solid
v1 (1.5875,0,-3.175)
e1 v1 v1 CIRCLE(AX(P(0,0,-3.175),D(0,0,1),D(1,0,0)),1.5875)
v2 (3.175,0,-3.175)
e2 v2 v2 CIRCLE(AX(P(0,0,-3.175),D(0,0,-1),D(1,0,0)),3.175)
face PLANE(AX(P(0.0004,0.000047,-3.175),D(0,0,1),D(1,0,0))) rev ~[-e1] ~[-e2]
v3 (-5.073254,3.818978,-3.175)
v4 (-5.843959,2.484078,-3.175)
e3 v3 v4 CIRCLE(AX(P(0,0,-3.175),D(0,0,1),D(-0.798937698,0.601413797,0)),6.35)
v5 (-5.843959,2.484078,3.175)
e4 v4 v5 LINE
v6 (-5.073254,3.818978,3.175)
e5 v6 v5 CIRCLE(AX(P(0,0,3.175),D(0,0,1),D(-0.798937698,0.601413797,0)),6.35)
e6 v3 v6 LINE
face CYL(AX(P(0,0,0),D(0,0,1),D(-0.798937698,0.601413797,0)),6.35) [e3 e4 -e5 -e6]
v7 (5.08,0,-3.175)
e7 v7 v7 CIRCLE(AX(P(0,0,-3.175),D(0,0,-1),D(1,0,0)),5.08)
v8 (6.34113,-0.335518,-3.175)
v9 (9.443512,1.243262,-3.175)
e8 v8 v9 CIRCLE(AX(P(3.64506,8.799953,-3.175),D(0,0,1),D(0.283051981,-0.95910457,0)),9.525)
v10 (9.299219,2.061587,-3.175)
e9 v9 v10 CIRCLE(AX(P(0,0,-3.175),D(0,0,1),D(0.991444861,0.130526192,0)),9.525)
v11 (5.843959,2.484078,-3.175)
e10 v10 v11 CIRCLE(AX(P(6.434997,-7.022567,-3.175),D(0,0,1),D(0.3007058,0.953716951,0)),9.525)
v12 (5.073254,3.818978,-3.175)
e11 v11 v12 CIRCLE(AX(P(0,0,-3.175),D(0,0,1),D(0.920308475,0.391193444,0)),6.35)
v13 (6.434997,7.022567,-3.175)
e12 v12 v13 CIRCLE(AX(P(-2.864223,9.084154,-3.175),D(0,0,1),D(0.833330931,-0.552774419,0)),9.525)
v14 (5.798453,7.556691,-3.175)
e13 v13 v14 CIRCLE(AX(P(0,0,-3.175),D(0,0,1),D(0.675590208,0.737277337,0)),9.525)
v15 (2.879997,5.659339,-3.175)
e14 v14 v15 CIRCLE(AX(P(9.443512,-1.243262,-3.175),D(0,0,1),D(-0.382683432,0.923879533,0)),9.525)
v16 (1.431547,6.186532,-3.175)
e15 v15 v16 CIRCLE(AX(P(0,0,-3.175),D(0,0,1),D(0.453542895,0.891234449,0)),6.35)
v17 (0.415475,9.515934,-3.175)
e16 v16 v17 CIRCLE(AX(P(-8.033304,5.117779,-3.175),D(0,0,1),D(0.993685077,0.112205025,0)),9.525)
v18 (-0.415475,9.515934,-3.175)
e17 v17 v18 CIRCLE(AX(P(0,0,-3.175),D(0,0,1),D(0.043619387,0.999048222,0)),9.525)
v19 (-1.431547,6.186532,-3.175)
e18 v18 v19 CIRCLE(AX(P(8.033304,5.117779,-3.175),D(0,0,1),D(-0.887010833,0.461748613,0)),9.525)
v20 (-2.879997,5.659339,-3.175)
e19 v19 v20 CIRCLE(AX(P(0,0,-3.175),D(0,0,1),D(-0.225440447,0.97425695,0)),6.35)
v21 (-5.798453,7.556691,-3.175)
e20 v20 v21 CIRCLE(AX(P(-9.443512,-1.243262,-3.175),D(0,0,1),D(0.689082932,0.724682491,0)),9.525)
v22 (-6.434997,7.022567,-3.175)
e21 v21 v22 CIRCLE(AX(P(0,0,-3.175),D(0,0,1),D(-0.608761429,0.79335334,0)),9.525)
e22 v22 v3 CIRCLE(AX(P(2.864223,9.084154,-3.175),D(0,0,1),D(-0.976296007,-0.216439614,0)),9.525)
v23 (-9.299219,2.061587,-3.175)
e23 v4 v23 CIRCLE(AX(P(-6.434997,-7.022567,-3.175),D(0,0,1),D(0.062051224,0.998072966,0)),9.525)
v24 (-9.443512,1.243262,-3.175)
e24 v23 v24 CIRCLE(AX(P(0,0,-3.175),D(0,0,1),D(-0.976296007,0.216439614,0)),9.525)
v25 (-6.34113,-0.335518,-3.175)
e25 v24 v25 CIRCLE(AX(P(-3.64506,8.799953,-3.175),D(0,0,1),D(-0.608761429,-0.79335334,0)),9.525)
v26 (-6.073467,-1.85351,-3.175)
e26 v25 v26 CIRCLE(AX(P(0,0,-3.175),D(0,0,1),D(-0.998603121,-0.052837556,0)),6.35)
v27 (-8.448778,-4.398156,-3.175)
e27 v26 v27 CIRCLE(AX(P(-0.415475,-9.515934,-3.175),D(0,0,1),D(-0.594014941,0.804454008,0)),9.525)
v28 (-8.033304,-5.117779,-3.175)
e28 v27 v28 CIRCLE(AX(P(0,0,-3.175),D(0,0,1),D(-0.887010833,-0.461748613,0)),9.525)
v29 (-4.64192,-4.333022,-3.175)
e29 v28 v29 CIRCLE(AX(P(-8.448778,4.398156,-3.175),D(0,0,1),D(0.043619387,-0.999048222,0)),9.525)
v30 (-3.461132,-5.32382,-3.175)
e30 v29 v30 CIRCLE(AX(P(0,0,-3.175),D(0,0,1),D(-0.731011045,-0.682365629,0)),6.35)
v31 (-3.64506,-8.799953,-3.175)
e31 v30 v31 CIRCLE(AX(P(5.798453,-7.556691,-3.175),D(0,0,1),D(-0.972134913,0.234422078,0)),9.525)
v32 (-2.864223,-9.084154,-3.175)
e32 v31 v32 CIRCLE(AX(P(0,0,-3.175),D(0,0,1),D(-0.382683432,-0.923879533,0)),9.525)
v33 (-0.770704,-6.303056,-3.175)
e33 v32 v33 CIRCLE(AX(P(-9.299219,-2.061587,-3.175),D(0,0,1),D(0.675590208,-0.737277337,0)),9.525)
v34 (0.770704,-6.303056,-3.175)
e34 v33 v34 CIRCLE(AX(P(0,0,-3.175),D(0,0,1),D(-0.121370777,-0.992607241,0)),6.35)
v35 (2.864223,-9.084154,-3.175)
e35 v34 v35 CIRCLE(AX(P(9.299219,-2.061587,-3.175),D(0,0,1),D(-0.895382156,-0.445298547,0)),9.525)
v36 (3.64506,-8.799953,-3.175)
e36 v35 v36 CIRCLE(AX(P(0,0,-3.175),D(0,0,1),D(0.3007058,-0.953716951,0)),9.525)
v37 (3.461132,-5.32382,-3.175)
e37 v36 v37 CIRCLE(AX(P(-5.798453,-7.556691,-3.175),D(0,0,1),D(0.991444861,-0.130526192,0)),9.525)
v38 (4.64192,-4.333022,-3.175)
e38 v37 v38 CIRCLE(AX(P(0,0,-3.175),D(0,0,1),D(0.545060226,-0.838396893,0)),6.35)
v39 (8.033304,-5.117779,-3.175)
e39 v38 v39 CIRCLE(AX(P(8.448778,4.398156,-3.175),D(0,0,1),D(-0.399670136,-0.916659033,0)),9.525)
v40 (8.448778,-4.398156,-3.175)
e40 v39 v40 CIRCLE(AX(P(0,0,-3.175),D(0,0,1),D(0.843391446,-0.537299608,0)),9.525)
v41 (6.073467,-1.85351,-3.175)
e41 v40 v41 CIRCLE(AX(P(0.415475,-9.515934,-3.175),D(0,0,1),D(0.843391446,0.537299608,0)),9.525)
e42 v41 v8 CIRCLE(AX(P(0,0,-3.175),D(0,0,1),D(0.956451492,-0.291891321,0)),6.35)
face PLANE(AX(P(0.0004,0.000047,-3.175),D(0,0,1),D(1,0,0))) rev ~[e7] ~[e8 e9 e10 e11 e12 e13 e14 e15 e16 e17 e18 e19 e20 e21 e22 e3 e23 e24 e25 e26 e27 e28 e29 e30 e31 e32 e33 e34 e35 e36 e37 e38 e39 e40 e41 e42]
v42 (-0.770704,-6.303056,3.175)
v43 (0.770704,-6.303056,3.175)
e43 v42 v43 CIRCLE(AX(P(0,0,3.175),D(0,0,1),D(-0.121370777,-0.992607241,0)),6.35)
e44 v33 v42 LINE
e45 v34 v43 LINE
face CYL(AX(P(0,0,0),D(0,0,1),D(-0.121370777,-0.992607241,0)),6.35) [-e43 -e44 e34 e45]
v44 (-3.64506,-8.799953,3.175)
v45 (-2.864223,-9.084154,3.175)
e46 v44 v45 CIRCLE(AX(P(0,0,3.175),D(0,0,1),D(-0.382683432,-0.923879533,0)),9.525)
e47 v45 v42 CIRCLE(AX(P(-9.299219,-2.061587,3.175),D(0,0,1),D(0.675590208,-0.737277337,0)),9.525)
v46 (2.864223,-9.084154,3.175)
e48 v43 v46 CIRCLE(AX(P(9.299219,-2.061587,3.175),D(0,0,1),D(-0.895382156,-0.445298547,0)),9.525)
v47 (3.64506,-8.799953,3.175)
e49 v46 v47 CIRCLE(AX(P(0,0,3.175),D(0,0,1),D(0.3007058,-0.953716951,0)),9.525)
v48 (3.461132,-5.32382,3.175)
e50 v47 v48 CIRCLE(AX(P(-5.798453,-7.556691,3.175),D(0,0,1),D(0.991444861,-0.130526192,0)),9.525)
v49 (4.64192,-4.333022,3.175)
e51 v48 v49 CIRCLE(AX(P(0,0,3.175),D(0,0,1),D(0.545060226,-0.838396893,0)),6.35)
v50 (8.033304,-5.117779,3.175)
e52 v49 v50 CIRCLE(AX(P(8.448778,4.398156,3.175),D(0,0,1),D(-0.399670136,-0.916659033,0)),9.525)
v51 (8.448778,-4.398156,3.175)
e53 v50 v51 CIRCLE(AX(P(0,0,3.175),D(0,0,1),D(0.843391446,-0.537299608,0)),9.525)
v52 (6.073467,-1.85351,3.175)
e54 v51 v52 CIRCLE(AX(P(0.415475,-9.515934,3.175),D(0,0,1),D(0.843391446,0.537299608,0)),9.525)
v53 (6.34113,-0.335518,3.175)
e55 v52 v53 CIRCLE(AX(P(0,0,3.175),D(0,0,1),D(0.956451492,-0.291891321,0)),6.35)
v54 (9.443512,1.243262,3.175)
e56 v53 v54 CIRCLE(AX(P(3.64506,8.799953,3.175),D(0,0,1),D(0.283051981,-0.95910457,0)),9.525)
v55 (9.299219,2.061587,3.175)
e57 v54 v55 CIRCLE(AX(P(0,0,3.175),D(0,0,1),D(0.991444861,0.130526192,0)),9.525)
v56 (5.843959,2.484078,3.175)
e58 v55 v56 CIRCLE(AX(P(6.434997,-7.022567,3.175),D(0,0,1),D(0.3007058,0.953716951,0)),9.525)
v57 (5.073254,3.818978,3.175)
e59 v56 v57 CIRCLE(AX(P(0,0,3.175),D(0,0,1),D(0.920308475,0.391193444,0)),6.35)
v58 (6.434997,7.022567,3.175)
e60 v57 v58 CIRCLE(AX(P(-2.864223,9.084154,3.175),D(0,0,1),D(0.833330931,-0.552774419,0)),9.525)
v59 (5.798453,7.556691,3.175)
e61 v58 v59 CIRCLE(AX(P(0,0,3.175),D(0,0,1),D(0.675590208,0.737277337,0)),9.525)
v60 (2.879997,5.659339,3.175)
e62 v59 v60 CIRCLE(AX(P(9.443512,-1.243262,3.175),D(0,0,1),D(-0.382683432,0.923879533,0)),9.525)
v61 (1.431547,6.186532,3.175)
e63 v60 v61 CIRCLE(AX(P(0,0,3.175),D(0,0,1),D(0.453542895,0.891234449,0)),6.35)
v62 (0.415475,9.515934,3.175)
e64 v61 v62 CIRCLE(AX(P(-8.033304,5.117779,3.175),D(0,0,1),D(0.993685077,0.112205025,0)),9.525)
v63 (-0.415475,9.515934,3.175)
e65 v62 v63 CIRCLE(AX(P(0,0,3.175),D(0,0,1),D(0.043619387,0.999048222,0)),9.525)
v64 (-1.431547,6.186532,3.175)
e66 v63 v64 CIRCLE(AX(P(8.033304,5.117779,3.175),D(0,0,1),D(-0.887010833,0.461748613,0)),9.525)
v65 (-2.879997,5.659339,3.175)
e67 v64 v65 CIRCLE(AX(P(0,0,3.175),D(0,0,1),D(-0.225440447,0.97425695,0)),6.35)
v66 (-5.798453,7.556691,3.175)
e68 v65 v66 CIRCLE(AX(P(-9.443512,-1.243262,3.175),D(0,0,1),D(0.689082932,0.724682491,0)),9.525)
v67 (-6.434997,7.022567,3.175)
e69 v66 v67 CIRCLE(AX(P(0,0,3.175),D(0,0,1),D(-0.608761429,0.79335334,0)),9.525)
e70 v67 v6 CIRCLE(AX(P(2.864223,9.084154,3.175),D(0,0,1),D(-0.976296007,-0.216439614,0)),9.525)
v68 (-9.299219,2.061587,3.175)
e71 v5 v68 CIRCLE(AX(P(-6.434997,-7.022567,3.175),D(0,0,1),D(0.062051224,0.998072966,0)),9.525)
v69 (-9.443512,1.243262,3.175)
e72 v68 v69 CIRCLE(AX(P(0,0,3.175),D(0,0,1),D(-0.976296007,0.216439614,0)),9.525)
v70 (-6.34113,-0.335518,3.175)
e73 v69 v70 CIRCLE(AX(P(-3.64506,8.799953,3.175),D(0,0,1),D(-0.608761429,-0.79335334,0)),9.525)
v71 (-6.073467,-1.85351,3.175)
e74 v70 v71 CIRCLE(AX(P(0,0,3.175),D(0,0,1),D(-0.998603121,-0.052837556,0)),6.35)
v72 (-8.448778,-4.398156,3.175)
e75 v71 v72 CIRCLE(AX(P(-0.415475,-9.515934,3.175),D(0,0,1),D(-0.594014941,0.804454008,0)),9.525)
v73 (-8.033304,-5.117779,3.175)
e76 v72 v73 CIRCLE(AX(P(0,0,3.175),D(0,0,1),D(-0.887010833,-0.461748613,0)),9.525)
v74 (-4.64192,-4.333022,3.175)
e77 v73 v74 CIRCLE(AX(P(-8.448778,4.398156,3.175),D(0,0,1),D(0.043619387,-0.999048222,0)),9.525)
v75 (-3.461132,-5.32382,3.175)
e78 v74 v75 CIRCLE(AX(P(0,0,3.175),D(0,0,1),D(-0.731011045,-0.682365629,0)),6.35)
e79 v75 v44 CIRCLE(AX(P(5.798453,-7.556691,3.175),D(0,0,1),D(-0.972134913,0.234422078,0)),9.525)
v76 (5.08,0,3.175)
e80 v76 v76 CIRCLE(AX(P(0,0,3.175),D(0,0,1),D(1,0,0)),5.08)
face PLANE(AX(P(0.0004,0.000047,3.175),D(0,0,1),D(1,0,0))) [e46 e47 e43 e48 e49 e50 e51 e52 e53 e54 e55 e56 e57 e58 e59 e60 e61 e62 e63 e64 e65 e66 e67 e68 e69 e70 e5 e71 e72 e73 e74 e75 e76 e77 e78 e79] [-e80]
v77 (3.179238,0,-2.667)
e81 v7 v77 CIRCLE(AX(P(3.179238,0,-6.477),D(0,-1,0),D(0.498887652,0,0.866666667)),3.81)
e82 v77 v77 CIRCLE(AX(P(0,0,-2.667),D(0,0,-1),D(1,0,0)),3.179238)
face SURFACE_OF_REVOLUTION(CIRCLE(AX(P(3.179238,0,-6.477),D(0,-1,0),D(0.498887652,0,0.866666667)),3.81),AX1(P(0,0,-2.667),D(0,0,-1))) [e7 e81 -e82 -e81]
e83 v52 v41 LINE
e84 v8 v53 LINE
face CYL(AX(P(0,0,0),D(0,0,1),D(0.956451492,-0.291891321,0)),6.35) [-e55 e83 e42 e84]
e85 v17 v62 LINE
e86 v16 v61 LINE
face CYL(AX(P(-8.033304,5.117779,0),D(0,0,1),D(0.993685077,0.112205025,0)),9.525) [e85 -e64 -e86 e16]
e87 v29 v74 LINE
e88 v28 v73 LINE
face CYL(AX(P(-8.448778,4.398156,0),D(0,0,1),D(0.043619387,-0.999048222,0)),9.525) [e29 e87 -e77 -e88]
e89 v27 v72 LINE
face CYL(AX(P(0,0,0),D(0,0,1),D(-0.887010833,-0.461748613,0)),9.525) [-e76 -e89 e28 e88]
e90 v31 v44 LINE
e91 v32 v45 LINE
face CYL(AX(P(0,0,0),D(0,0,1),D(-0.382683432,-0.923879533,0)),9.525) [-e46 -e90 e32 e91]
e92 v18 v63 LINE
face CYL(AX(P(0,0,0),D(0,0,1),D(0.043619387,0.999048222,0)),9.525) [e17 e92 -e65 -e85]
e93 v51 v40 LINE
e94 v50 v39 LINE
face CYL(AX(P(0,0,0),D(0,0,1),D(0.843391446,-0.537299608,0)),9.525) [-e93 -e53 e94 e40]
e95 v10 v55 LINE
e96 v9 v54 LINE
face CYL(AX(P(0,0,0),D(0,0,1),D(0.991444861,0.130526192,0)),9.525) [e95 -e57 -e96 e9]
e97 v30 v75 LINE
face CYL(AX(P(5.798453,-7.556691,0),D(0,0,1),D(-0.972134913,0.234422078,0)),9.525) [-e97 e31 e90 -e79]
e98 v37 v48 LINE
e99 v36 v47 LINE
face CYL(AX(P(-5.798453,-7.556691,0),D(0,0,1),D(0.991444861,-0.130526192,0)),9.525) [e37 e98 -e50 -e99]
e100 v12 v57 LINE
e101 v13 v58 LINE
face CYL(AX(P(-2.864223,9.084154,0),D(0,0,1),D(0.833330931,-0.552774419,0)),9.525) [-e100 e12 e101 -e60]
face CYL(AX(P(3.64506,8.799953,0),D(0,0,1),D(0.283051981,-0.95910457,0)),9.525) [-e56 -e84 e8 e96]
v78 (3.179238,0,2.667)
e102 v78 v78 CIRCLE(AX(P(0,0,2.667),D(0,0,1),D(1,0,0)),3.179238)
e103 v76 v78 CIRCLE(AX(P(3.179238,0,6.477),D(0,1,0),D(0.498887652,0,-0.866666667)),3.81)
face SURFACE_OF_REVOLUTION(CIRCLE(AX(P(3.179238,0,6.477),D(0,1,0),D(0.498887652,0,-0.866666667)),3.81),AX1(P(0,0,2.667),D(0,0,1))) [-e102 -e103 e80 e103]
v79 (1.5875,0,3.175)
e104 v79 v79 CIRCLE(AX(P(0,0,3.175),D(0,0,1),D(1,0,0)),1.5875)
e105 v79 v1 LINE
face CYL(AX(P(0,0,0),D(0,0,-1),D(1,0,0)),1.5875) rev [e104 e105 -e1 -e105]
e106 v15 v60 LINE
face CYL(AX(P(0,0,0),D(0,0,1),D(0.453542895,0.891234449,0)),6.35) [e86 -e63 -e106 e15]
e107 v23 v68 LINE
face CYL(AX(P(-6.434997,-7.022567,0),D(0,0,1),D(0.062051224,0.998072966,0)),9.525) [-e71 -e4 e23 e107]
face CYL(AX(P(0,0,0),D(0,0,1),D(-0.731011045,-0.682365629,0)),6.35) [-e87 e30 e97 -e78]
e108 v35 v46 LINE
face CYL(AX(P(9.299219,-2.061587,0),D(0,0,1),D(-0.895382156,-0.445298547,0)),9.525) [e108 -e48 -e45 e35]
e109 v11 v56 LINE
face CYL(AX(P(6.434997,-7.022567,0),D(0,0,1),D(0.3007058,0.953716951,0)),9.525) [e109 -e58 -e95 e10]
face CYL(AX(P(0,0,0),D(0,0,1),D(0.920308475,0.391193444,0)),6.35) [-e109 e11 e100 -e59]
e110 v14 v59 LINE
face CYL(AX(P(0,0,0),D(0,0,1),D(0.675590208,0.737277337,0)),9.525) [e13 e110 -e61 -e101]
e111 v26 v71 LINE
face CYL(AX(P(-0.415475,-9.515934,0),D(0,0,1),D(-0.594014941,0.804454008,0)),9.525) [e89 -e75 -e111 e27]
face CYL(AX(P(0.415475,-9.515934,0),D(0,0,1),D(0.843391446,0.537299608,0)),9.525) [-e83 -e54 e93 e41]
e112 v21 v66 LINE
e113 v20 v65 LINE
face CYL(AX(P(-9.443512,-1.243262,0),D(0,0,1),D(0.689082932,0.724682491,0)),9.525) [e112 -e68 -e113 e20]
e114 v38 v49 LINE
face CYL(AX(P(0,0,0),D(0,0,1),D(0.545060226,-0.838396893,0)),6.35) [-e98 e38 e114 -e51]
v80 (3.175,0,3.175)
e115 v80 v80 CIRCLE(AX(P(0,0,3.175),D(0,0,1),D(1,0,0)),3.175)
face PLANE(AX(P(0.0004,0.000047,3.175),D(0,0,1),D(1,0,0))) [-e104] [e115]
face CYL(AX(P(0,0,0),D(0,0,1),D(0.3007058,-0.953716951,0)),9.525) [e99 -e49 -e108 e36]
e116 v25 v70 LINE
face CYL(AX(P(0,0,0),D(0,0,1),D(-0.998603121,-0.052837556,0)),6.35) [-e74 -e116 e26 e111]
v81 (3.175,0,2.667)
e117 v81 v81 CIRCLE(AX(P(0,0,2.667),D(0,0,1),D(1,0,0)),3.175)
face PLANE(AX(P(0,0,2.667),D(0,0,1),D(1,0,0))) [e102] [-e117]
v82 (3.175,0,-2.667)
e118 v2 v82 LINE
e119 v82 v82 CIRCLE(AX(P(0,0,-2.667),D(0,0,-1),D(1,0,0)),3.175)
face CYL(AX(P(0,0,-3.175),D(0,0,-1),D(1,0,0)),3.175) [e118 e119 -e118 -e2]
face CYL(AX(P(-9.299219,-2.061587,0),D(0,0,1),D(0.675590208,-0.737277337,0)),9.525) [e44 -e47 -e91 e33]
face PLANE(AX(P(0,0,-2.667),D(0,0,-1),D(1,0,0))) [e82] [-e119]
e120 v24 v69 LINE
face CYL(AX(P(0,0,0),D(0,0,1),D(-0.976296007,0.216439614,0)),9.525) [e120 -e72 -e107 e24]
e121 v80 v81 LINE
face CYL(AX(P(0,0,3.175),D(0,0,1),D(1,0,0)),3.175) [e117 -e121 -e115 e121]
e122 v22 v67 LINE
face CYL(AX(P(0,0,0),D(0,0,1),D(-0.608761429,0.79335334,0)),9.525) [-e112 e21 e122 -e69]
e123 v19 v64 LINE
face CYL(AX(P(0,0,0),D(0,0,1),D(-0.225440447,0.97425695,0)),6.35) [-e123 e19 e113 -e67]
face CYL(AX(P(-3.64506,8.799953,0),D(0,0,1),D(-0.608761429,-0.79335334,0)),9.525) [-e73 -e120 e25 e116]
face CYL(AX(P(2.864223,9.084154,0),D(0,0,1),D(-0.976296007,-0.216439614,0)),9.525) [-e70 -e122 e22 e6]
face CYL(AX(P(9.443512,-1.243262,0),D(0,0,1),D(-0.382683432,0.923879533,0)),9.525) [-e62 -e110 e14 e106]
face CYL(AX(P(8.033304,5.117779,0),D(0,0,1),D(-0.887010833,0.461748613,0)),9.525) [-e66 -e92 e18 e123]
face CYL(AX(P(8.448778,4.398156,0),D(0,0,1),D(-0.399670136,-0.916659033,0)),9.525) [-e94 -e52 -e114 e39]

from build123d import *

# Parameters (mm, degrees)
F0_R     = 4.7625
F0_R_2   = 3.175
F0_R_3   = 1.5875
F1_DEPTH = 3.175
F2_R     = 5.08
F2_R_2   = 3.175
F3_DEPTH = 0.508
F4_R     = 5.08
F4_R_2   = 3.175
F5_DEPTH = 0.508


# Not quite as in the source:
# - a fillet or chamfer that OpenCascade refuses, or shapes differently, is made with other operations: its cross-section is extruded or revolved along the edge and cut away or added


with BuildPart() as f1:
    # F0 (on Top) → F1 (new body, symmetric)
    with BuildSketch(Plane.XY):
        with BuildLine():
            ThreePointArc((6.3411298165, -0.3355184801), (6.3477820668, -0.1678178556), (6.35, 0))
            ThreePointArc((6.35, 0), (6.222203729, 1.2675491134), (5.8439588173, 2.4840783686))
            ThreePointArc((5.8439588173, 2.4840783686), (5.499261314, 3.175), (5.0732543809, 3.8189776102))
            ThreePointArc((5.0732543809, 3.8189776102), (4.0817013215, 4.8643822138), (2.879997381, 5.6593387498))
            ThreePointArc((2.879997381, 5.6593387498), (2.1718279101, 5.967048142), (1.4315468375, 6.1865316335))
            ThreePointArc((1.4315468375, 6.1865316335), (0, 6.35), (-1.4315468375, 6.1865316335))
            ThreePointArc((-1.4315468375, 6.1865316335), (-2.1718279101, 5.967048142), (-2.879997381, 5.6593387498))
            ThreePointArc((-2.879997381, 5.6593387498), (-4.0817013215, 4.8643822138), (-5.0732543809, 3.8189776102))
            ThreePointArc((-5.0732543809, 3.8189776102), (-5.499261314, 3.175), (-5.8439588173, 2.4840783686))
            ThreePointArc((-5.8439588173, 2.4840783686), (-6.2535292316, 1.1026659282), (-6.3411298165, -0.3355184801))
            ThreePointArc((-6.3411298165, -0.3355184801), (-6.2535292316, -1.1026659282), (-6.0734669747, -1.8535098888))
            ThreePointArc((-6.0734669747, -1.8535098888), (-5.499261314, -3.175), (-4.6419201372, -4.3330217447))
            ThreePointArc((-4.6419201372, -4.3330217447), (-4.0817013215, -4.8643822138), (-3.4611324355, -5.3238202697))
            ThreePointArc((-3.4611324355, -5.3238202697), (-2.1718279101, -5.967048142), (-0.7707044365, -6.3030559788))
            ThreePointArc((-0.7707044365, -6.3030559788), (0, -6.35), (0.7707044365, -6.3030559788))
            ThreePointArc((0.7707044365, -6.3030559788), (2.1718279101, -5.967048142), (3.4611324355, -5.3238202697))
            ThreePointArc((3.4611324355, -5.3238202697), (4.0817013215, -4.8643822138), (4.6419201372, -4.3330217447))
            ThreePointArc((4.6419201372, -4.3330217447), (5.499261314, -3.175), (6.0734669747, -1.8535098888))
            ThreePointArc((6.0734669747, -1.8535098888), (6.2535292316, -1.1026659282), (6.3411298165, -0.3355184801))
        make_face()
        Circle(F0_R, mode=Mode.SUBTRACT)
        Circle(F0_R)
        Circle(F0_R_2, mode=Mode.SUBTRACT)
        Circle(F0_R_2)
        Circle(F0_R_3, mode=Mode.SUBTRACT)
        with BuildLine():
            ThreePointArc((5.8439588173, 2.4840783686), (6.222203729, 1.2675491134), (6.35, 0))
            ThreePointArc((6.35, 0), (6.3477820668, -0.1678178556), (6.3411298165, -0.3355184801))
            ThreePointArc((6.3411298165, -0.3355184801), (7.9650557648, 0.3109444224), (9.4435123046, 1.2432619809))
            ThreePointArc((9.4435123046, 1.2432619809), (9.3802938474, 1.6539988923), (9.2992194678, 2.0615873228))
            ThreePointArc((9.2992194678, 2.0615873228), (7.5910533822, 2.4320173351), (5.8439588173, 2.4840783686))
        make_face()
        with BuildLine():
            ThreePointArc((2.879997381, 5.6593387498), (4.0817013215, 4.8643822138), (5.0732543809, 3.8189776102))
            ThreePointArc((5.0732543809, 3.8189776102), (5.9017154857, 5.358036403), (6.4349967275, 7.0225666331))
            ThreePointArc((6.4349967275, 7.0225666331), (6.1225519823, 7.2965733207), (5.7984526113, 7.5566905663))
            ThreePointArc((5.7984526113, 7.5566905663), (4.2518136514, 6.7424684237), (2.879997381, 5.6593387498))
        make_face()
        with BuildLine():
            ThreePointArc((8.448778186, -4.3981555411), (7.3783548704, -3.0164016935), (6.0734669747, -1.8535098888))
            ThreePointArc((6.0734669747, -1.8535098888), (5.499261314, -3.175), (4.6419201372, -4.3330217447))
            ThreePointArc((4.6419201372, -4.3330217447), (6.3014579298, -4.8816419092), (8.0333035214, -5.1177787695))
            ThreePointArc((8.0333035214, -5.1177787695), (8.248891971, -4.7625), (8.448778186, -4.3981555411))
        make_face()
        with BuildLine():
            ThreePointArc((-1.4315468375, 6.1865316335), (0, 6.35), (1.4315468375, 6.1865316335))
            ThreePointArc((1.4315468375, 6.1865316335), (1.0768969406, 7.8980436026), (0.4154746647, 9.5159343106))
            ThreePointArc((0.4154746647, 9.5159343106), (0, 9.525), (-0.4154746647, 9.5159343106))
            ThreePointArc((-0.4154746647, 9.5159343106), (-1.0768969406, 7.8980436026), (-1.4315468375, 6.1865316335))
        make_face()
        with BuildLine():
            ThreePointArc((3.6450596933, -8.7999525472), (3.7132421134, -7.0534128461), (3.4611324355, -5.3238202697))
            ThreePointArc((3.4611324355, -5.3238202697), (2.1718279101, -5.967048142), (0.7707044365, -6.3030559788))
            ThreePointArc((0.7707044365, -6.3030559788), (1.6893378965, -7.790053738), (2.8642227403, -9.0841539559))
            ThreePointArc((2.8642227403, -9.0841539559), (3.2577418652, -8.950572213), (3.6450596933, -8.7999525472))
        make_face()
        with BuildLine():
            ThreePointArc((-5.0732543809, 3.8189776102), (-4.0817013215, 4.8643822138), (-2.879997381, 5.6593387498))
            ThreePointArc((-2.879997381, 5.6593387498), (-4.2518136514, 6.7424684237), (-5.7984526113, 7.5566905663))
            ThreePointArc((-5.7984526113, 7.5566905663), (-6.1225519823, 7.2965733207), (-6.4349967275, 7.0225666331))
            ThreePointArc((-6.4349967275, 7.0225666331), (-5.9017154857, 5.358036403), (-5.0732543809, 3.8189776102))
        make_face()
        with BuildLine():
            ThreePointArc((-2.8642227403, -9.0841539559), (-1.6893378965, -7.790053738), (-0.7707044365, -6.3030559788))
            ThreePointArc((-0.7707044365, -6.3030559788), (-2.1718279101, -5.967048142), (-3.4611324355, -5.3238202697))
            ThreePointArc((-3.4611324355, -5.3238202697), (-3.7132421134, -7.0534128461), (-3.6450596933, -8.7999525472))
            ThreePointArc((-3.6450596933, -8.7999525472), (-3.2577418652, -8.950572213), (-2.8642227403, -9.0841539559))
        make_face()
        with BuildLine():
            ThreePointArc((-6.3411298165, -0.3355184801), (-6.2535292316, 1.1026659282), (-5.8439588173, 2.4840783686))
            ThreePointArc((-5.8439588173, 2.4840783686), (-7.5910533822, 2.4320173351), (-9.2992194678, 2.0615873228))
            ThreePointArc((-9.2992194678, 2.0615873228), (-9.3802938474, 1.6539988923), (-9.4435123046, 1.2432619809))
            ThreePointArc((-9.4435123046, 1.2432619809), (-7.9650557648, 0.3109444224), (-6.3411298165, -0.3355184801))
        make_face()
        with BuildLine():
            ThreePointArc((-8.0333035214, -5.1177787695), (-6.3014579298, -4.8816419092), (-4.6419201372, -4.3330217447))
            ThreePointArc((-4.6419201372, -4.3330217447), (-5.499261314, -3.175), (-6.0734669747, -1.8535098888))
            ThreePointArc((-6.0734669747, -1.8535098888), (-7.3783548704, -3.0164016935), (-8.448778186, -4.3981555411))
            ThreePointArc((-8.448778186, -4.3981555411), (-8.248891971, -4.7625), (-8.0333035214, -5.1177787695))
        make_face()
    extrude(amount=F1_DEPTH, both=True)

    # F2 (on face) → F3 (cut)
    with BuildSketch(Plane(origin=(0, 0, -3.175), x_dir=(1, 0, 0), z_dir=(0, 0, -1))):
        Circle(F2_R)
        Circle(F2_R_2, mode=Mode.SUBTRACT)
    extrude(amount=-F3_DEPTH, mode=Mode.SUBTRACT)

    # F4 (on face) → F5 (cut)
    with BuildSketch(Plane.XY.offset(3.175)):
        Circle(F4_R)
        Circle(F4_R_2, mode=Mode.SUBTRACT)
    extrude(amount=-F5_DEPTH, mode=Mode.SUBTRACT)

    # F6: fillet of radius 3.81 on 2 edges, made by hand

    # F6_s1 → F6_t2 (revolve)
    with BuildSketch(Plane.XZ):
        with BuildLine():
            ThreePointArc((5.08, 3.175), (4.1629758175, 2.7961903065), (3.1792380475, 2.667))
            Line((3.1792380475, 2.667), (5.08, 2.667))
            Line((5.08, 2.667), (5.08, 3.175))
        make_face()
    revolve(axis=Axis((0, 0, 2.667), (0, 0, 1)))

    # F6_s3 → F6_t4 (revolve)
    with BuildSketch(Plane.XZ):
        with BuildLine():
            ThreePointArc((5.08, -3.175), (4.1629758175, -2.7961903065), (3.1792380475, -2.667))
            Line((3.1792380475, -2.667), (5.08, -2.667))
            Line((5.08, -2.667), (5.08, -3.175))
        make_face()
    revolve(axis=Axis((0, 0, -2.667), (0, 0, -1)))


solid = f1.part
